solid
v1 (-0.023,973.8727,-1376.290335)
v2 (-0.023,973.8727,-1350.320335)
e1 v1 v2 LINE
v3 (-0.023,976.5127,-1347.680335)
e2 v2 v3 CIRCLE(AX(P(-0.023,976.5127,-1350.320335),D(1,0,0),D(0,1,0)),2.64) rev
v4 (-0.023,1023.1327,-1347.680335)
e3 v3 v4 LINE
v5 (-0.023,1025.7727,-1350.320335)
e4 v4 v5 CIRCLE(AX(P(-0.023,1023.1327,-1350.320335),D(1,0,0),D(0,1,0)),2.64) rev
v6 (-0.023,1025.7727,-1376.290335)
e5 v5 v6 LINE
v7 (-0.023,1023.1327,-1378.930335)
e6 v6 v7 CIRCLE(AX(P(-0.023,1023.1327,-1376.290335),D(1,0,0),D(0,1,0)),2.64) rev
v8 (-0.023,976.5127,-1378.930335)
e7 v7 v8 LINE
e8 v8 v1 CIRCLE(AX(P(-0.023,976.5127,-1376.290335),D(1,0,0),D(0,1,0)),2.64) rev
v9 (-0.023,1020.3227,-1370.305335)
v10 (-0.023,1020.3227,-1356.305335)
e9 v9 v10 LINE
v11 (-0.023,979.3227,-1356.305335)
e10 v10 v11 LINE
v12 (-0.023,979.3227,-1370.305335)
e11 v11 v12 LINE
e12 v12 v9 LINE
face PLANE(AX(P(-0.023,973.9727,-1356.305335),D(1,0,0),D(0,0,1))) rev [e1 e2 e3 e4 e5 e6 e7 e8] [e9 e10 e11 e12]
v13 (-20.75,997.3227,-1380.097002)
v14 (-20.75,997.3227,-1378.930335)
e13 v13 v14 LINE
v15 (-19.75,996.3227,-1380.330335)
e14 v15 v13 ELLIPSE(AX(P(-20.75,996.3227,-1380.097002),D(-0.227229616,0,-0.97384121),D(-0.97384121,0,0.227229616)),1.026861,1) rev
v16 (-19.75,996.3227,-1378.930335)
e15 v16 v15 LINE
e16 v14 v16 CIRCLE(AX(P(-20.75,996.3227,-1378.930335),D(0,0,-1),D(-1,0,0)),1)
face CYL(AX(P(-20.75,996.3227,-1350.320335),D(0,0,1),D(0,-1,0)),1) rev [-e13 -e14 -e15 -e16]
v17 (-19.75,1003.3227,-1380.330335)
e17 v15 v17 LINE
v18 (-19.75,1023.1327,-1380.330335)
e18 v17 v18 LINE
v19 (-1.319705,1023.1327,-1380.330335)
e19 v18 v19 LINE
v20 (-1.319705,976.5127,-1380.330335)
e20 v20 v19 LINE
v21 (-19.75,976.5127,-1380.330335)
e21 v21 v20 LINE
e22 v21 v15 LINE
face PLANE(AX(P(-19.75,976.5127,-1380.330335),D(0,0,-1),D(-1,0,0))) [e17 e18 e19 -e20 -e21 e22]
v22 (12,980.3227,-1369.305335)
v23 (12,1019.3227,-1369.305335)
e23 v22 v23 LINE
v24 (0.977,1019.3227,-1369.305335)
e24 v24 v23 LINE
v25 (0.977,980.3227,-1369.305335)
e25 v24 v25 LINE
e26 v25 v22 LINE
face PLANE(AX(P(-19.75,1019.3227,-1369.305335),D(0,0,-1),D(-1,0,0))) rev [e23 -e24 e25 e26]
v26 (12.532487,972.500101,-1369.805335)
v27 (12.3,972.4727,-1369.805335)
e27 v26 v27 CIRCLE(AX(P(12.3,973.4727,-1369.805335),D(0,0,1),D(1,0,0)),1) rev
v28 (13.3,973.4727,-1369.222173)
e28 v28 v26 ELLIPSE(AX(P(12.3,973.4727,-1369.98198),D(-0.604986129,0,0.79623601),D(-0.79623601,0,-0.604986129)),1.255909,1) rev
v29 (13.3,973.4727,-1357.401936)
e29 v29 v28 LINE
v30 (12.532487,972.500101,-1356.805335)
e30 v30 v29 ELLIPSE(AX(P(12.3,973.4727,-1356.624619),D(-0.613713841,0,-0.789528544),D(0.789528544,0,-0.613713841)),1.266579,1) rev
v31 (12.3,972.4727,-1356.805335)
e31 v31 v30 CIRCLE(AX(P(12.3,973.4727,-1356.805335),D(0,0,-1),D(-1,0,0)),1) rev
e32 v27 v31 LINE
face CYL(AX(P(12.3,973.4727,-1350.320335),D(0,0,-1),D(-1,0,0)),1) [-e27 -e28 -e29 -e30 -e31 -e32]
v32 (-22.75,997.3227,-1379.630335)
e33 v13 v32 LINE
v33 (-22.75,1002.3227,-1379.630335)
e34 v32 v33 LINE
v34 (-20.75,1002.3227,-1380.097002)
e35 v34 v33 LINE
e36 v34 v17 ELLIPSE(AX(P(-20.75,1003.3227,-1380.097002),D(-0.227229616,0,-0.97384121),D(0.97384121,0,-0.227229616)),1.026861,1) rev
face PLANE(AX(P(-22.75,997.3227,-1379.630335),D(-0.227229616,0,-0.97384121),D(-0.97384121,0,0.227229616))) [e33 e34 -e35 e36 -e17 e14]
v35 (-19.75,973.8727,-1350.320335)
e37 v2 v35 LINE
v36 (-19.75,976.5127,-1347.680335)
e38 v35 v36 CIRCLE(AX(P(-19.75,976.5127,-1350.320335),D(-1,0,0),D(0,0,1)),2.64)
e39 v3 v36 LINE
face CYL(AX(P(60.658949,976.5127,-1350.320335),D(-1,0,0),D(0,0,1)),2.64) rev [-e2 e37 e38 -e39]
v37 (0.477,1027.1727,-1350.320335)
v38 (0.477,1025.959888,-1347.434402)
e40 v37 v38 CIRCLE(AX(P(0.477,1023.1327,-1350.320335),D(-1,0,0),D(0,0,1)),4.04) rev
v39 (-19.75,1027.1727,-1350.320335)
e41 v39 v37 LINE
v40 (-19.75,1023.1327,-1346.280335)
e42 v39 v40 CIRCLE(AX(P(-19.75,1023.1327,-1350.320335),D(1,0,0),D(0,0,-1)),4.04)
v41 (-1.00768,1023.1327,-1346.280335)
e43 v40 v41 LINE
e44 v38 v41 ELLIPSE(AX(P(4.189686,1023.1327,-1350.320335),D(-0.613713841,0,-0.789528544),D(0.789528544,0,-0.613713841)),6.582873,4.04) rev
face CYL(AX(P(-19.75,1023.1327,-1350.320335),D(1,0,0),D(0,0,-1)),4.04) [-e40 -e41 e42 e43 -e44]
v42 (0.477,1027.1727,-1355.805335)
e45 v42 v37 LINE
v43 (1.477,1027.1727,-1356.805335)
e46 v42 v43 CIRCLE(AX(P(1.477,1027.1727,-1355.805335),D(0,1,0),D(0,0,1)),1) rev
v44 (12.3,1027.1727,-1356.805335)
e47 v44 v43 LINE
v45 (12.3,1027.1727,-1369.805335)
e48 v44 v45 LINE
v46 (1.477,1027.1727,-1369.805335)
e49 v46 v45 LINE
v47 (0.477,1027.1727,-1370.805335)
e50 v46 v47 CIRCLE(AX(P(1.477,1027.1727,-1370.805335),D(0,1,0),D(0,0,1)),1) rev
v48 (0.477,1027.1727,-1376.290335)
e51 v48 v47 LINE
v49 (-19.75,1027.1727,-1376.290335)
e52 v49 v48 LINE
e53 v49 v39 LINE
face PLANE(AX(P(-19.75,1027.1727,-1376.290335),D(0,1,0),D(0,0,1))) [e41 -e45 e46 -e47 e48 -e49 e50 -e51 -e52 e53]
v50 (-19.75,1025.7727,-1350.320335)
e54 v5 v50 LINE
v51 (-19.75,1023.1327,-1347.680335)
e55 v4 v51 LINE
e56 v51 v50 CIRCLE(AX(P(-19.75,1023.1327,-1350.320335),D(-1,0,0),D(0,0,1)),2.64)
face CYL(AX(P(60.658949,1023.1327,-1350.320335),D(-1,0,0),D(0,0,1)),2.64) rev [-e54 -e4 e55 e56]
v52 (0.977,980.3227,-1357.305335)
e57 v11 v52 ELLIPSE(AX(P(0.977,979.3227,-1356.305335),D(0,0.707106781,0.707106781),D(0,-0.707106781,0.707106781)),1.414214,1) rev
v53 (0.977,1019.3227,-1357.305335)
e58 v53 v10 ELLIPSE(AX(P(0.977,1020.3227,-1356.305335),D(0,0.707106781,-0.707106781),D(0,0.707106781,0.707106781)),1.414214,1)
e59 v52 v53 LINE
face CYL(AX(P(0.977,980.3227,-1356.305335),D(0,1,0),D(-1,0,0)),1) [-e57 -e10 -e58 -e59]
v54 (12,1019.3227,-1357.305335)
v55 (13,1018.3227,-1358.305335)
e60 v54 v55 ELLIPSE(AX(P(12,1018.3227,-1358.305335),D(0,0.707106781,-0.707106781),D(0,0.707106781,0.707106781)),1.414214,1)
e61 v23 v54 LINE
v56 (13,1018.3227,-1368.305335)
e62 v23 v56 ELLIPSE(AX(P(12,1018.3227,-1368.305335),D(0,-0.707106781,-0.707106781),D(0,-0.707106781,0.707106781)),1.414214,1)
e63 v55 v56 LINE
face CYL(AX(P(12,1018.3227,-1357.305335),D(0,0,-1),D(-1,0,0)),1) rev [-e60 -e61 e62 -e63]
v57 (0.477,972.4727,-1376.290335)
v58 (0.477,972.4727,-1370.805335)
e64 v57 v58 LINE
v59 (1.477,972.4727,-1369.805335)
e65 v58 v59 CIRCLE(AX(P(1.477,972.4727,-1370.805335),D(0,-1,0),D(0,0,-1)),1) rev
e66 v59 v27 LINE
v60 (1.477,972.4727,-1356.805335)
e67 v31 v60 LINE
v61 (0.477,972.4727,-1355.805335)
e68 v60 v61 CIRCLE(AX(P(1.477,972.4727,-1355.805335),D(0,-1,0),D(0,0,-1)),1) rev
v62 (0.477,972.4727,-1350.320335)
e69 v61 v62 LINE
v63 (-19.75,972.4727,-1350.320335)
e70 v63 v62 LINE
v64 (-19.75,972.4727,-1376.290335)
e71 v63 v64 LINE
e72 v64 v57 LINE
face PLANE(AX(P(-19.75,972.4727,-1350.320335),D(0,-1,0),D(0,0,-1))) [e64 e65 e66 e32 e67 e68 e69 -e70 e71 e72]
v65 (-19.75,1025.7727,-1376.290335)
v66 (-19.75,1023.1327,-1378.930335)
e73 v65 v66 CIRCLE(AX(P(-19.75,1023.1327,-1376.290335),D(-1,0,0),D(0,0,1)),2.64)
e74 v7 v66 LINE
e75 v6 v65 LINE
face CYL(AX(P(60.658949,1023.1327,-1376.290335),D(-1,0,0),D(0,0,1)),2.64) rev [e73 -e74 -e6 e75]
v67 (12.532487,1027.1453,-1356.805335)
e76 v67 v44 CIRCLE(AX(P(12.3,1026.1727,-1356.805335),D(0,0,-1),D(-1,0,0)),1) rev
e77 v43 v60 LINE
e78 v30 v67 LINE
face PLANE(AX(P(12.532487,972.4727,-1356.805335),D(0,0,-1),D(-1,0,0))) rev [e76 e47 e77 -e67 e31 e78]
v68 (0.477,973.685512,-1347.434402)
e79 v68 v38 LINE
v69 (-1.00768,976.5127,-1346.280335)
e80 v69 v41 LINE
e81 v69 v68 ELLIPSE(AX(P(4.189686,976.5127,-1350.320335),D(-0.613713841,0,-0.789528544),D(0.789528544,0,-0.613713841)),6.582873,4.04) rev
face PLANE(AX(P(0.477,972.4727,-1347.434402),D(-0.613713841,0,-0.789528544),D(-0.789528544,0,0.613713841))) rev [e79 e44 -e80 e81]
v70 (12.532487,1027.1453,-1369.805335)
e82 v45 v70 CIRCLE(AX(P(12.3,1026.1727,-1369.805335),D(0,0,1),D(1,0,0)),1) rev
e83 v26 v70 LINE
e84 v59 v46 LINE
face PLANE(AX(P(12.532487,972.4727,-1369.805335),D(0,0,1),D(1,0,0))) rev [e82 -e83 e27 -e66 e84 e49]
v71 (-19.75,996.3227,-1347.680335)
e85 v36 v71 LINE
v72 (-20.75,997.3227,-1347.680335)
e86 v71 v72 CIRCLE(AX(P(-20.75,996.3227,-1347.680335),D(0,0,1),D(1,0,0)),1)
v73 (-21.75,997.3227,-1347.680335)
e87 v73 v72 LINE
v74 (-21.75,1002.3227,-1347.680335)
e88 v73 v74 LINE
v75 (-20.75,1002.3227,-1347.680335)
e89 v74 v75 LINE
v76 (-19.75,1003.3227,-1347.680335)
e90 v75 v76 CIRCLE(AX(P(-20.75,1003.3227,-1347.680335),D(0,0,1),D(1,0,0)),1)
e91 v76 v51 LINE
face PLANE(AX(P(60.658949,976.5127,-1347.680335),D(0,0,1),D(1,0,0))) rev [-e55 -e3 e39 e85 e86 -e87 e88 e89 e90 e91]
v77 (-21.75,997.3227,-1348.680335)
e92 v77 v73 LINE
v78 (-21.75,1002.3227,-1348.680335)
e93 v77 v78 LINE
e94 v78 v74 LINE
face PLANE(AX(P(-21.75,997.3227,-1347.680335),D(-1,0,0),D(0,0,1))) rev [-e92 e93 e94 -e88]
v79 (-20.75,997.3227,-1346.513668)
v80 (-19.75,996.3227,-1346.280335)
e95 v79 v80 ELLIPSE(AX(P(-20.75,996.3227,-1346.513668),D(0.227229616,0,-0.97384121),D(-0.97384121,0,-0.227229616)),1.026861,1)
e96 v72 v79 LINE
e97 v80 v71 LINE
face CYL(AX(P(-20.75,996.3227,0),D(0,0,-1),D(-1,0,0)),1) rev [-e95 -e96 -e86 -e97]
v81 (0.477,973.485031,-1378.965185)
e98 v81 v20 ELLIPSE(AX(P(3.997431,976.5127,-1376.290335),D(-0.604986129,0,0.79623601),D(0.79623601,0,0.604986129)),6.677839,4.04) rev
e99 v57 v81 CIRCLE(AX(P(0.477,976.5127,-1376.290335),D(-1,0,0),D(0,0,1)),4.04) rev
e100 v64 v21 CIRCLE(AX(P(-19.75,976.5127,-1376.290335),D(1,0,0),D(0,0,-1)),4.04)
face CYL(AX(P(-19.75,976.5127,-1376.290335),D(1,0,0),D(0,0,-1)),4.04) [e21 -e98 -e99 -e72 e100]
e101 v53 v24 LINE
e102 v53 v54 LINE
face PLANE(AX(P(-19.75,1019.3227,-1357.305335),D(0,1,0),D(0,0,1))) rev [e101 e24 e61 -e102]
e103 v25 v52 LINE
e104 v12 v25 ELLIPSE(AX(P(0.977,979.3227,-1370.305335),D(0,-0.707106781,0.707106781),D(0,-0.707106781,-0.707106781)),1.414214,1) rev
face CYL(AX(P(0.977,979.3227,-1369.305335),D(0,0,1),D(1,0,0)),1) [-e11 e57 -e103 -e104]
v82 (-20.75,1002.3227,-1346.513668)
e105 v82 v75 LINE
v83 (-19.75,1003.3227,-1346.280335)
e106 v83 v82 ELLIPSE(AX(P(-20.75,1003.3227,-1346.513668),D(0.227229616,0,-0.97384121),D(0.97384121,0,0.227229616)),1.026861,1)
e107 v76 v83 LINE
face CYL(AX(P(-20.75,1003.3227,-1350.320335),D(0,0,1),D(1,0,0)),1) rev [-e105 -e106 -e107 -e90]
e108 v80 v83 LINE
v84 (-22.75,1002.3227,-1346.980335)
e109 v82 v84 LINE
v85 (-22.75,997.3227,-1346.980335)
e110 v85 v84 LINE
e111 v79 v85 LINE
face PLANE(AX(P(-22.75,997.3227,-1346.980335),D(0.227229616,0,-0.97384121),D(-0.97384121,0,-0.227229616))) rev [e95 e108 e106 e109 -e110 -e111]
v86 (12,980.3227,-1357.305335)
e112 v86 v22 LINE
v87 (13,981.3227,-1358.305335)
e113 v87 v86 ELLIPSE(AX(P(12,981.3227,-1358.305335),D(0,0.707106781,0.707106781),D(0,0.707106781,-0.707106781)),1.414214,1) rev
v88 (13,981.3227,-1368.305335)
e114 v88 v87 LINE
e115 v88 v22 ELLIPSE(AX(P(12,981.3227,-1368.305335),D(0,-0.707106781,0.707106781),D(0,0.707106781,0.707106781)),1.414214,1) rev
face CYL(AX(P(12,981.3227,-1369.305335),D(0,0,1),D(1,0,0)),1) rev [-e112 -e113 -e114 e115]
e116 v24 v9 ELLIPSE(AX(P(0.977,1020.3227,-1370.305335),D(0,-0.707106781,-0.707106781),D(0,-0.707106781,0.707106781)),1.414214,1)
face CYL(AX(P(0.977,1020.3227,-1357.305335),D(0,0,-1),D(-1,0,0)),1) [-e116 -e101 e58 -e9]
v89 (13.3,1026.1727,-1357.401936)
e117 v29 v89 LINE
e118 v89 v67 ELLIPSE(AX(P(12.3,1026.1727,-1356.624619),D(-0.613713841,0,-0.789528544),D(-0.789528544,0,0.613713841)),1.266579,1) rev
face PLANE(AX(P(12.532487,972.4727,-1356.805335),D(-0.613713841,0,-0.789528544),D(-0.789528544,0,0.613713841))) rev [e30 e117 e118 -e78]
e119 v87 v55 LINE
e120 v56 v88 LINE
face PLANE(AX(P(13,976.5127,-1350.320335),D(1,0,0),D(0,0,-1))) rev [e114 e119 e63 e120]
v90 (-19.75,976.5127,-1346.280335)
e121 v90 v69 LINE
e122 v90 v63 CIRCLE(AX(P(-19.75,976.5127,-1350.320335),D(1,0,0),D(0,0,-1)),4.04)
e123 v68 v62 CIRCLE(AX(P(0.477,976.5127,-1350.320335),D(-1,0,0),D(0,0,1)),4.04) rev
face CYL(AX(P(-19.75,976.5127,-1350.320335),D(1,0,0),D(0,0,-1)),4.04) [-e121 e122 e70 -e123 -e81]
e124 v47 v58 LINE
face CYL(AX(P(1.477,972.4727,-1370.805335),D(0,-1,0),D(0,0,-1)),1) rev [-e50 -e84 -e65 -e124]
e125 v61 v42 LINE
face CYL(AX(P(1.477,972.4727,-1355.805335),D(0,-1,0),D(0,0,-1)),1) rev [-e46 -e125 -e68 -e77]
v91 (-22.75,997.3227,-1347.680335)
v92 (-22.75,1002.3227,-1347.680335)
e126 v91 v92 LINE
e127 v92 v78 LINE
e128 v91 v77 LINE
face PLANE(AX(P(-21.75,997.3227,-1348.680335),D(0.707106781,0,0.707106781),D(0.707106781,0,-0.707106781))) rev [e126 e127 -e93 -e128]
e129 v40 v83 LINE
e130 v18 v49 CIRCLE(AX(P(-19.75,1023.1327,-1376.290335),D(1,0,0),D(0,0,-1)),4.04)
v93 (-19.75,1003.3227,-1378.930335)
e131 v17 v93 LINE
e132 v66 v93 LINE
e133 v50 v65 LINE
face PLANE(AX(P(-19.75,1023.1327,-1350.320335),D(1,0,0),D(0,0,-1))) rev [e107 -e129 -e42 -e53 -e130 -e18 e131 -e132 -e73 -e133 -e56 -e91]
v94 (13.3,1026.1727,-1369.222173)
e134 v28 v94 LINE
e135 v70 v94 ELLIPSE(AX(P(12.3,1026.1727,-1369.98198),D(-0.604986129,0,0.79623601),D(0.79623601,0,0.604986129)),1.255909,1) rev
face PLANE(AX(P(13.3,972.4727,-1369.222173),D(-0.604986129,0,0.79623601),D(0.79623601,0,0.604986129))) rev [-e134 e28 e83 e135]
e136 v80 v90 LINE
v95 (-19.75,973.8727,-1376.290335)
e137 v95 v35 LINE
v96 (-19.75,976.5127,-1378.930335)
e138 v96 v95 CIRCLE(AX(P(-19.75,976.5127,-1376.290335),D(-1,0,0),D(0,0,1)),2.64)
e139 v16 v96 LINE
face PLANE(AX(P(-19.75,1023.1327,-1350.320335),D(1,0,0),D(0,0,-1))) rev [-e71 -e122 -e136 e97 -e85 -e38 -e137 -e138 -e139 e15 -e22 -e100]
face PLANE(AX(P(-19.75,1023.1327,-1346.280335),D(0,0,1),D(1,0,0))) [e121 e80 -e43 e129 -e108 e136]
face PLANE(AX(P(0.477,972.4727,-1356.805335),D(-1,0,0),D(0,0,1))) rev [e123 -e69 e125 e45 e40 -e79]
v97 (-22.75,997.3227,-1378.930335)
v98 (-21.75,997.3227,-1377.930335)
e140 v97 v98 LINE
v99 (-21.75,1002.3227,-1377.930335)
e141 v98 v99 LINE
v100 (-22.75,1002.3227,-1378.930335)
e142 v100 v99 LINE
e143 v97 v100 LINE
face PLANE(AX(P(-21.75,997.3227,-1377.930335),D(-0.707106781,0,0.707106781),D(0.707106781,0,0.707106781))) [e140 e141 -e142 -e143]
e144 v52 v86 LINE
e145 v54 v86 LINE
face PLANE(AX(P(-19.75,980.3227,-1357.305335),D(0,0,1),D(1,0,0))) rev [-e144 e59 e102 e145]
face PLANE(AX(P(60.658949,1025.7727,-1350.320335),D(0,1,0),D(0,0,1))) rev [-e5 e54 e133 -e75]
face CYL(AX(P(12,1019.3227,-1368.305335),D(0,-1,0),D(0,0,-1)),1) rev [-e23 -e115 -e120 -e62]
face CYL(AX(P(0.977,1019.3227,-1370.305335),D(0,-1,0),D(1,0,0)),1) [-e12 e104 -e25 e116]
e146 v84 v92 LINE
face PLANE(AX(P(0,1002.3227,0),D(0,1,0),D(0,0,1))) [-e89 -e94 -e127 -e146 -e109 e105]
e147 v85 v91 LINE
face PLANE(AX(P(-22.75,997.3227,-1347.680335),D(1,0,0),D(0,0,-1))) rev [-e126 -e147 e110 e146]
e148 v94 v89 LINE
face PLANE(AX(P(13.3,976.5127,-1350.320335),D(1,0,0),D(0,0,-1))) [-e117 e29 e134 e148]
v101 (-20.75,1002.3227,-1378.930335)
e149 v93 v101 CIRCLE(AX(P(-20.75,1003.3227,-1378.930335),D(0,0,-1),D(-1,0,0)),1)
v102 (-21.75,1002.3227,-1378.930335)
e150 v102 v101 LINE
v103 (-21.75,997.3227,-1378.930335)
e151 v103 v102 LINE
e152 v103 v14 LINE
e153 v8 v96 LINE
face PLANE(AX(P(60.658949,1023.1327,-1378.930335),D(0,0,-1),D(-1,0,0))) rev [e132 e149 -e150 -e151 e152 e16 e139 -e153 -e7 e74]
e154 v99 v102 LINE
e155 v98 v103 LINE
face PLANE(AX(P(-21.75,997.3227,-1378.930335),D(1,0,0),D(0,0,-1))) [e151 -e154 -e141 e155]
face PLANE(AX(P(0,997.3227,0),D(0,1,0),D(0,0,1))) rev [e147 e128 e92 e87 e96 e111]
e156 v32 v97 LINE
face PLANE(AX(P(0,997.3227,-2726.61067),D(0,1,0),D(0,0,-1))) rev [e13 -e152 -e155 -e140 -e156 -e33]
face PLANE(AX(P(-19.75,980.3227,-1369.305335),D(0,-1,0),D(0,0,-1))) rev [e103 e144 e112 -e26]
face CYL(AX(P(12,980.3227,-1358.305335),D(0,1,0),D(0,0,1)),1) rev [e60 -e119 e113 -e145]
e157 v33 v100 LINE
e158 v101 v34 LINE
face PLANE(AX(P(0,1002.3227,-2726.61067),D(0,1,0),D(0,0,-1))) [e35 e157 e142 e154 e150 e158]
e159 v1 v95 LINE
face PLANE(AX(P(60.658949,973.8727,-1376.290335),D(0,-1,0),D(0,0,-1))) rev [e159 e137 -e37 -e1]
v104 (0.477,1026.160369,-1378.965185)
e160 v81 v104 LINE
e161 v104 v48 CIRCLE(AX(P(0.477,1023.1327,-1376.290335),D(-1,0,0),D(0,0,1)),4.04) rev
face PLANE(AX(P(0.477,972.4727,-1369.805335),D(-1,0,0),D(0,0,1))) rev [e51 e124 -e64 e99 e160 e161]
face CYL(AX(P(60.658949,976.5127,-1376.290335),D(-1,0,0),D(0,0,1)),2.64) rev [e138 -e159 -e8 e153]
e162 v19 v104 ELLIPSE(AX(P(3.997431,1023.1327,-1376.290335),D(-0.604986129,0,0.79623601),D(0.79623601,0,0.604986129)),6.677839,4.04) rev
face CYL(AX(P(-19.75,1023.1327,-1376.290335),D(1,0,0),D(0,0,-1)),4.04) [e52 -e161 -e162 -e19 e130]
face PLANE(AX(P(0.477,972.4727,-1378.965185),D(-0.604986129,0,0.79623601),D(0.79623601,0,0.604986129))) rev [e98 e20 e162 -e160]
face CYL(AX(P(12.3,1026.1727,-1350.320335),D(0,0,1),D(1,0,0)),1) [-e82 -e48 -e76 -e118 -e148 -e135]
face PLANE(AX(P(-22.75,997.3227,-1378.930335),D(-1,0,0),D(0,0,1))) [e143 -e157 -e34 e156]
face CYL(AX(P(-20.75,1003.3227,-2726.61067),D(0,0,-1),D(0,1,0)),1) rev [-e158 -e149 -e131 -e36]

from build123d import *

# Parameters (mm, degrees)
BOSS_EXTRUDE2_DEPTH      = 13
BOSS_EXTRUDE2_DEPTH_BACK = 19.75
SKETCH2_W                = 39
SKETCH2_H                = 12
BOSS_EXTRUDE3_DEPTH      = 0.3
CUT_EXTRUDE1_DEPTH       = 19.727
CLIP_EDGE_DEPTH          = 2.5
FILLET1_R                = 1
CUT_EXTRUDE2_DEPTH       = 1382.6010589
FILLET2_R                = 1


with BuildPart() as part:
    # Sketch2 → Boss-Extrude2 (new, two sides: drawn at the far end of the back side and taken through both)
    with BuildSketch(Plane(origin=(0, 0, 0), x_dir=(0, -1, 0), z_dir=(1, 0, 0)).offset(-BOSS_EXTRUDE2_DEPTH_BACK)):
        with BuildLine():
            Line((-1027.172700071, 1376.290334899), (-1027.172700071, 1350.320334899))
            ThreePointArc((-1027.172700071, 1350.320334899), (-1025.989411467, 1347.463623503), (-1023.132700071, 1346.280334899))
            Line((-1023.132700071, 1346.280334899), (-976.512700071, 1346.280334899))
            ThreePointArc((-976.512700071, 1346.280334899), (-973.655988675, 1347.463623503), (-972.472700071, 1350.320334899))
            Line((-972.472700071, 1350.320334899), (-972.472700071, 1376.290334899))
            ThreePointArc((-972.472700071, 1376.290334899), (-973.655988675, 1379.147046295), (-976.512700071, 1380.330334899))
            Line((-976.512700071, 1380.330334899), (-1023.132700071, 1380.330334899))
            ThreePointArc((-1023.132700071, 1380.330334899), (-1025.989411467, 1379.147046295), (-1027.172700071, 1376.290334899))
        make_face()
        with Locations((-999.822700071, 1363.305334899)):
            Rectangle(SKETCH2_W, SKETCH2_H, mode=Mode.SUBTRACT)
    extrude(amount=BOSS_EXTRUDE2_DEPTH + BOSS_EXTRUDE2_DEPTH_BACK)

    # Sketch3 → Boss-Extrude3 (add)
    with BuildSketch(Plane.YZ.offset(13)):
        with BuildLine():
            Line((972.472700071, -1350.320334899), (972.472700071, -1376.290334899))
            ThreePointArc((972.472700071, -1376.290334899), (973.655988675, -1379.147046295), (976.512700071, -1380.330334899))
            Line((976.512700071, -1380.330334899), (1023.132700071, -1380.330334899))
            ThreePointArc((1023.132700071, -1380.330334899), (1025.989411467, -1379.147046295), (1027.172700071, -1376.290334899))
            Line((1027.172700071, -1376.290334899), (1027.172700071, -1350.320334899))
            ThreePointArc((1027.172700071, -1350.320334899), (1025.989411467, -1347.463623503), (1023.132700071, -1346.280334899))
            Line((1023.132700071, -1346.280334899), (976.512700071, -1346.280334899))
            ThreePointArc((976.512700071, -1346.280334899), (973.655988675, -1347.463623503), (972.472700071, -1350.320334899))
        make_face()
    extrude(amount=BOSS_EXTRUDE3_DEPTH)

    # Sketch6 → Cut-Extrude1 (cut)
    with BuildSketch(Plane(origin=(-19.75, 0, 0), x_dir=(0, -1, 0), z_dir=(-1, 0, 0))):
        with BuildLine():
            Line((-1025.772700071, -1350.320334899), (-1025.772700071, -1376.290334899))
            ThreePointArc((-1025.772700071, -1376.290334899), (-1024.999461974, -1378.157096801), (-1023.132700071, -1378.930334899))
            Line((-1023.132700071, -1378.930334899), (-976.512700071, -1378.930334899))
            ThreePointArc((-976.512700071, -1378.930334899), (-974.645938169, -1378.157096801), (-973.872700071, -1376.290334899))
            Line((-973.872700071, -1376.290334899), (-973.872700071, -1350.320334899))
            ThreePointArc((-973.872700071, -1350.320334899), (-974.645938169, -1348.453572996), (-976.512700071, -1347.680334899))
            Line((-976.512700071, -1347.680334899), (-1023.132700071, -1347.680334899))
            ThreePointArc((-1023.132700071, -1347.680334899), (-1024.999461974, -1348.453572996), (-1025.772700071, -1350.320334899))
        make_face()
    extrude(amount=-CUT_EXTRUDE1_DEPTH, mode=Mode.SUBTRACT)

    # Sketch10 → Clip Edge (add, symmetric)
    with BuildSketch(Plane(origin=(0, 999.822700071, 0), x_dir=(-1, 0, 0), z_dir=(0, -1, 0))):
        Polygon((19.75, 1346.280334899), (19.75, 1347.680334899), (21.75, 1347.680334899), (21.75, 1348.680334899), (22.75, 1347.680334899), (22.75, 1346.980334899), align=None)
    clip_edge = extrude(amount=CLIP_EDGE_DEPTH, both=True)

    # Mirror1: Clip Edge across plane
    add(clip_edge.mirror(Plane(origin=(0, 0, -1363.305334899), x_dir=(1, 0, 0), z_dir=(0, 0, -1))))

    # Fillet1
    # the kernel refuses this fillet: 1 mm, written as the material it adds along each edge
    with BuildSketch(Plane(origin=(-19.75, 1002.322700071, -1346.280334899), x_dir=(0, 1, 0), z_dir=(0, 0, -1))) as fillet1_piece_1_section:
        with BuildLine():
            CenterArc((FILLET1_R, -FILLET1_R), FILLET1_R, 90, 90)
            Line((0, -FILLET1_R), (0, 0))
            Line((0, 0), (FILLET1_R, 0))
        make_face()
    fillet1_piece_1 = extrude(amount=1.4, mode=Mode.PRIVATE)
    fillet1_piece_1 = split(fillet1_piece_1, bisect_by=Plane(origin=(-20.117660962, 1002.553814872, -1346.366122456), z_dir=(0.22722961560622243, 0, -0.973841209741839)), keep=Keep.TOP, mode=Mode.PRIVATE)
    add(fillet1_piece_1)
    with BuildSketch(Plane(origin=(-19.75, 997.322700071, -1346.280334899), x_dir=(0, -1, 0), z_dir=(0, 0, -1))) as fillet1_piece_2_section:
        with BuildLine():
            CenterArc((FILLET1_R, FILLET1_R), FILLET1_R, 180, 90)
            Line((0, FILLET1_R), (0, 0))
            Line((0, 0), (FILLET1_R, 0))
        make_face()
    fillet1_piece_2 = extrude(amount=1.4, mode=Mode.PRIVATE)
    fillet1_piece_2 = split(fillet1_piece_2, bisect_by=Plane(origin=(-20.117660962, 997.091585271, -1346.366122456), z_dir=(0.22722961560622243, 0, -0.973841209741839)), keep=Keep.TOP, mode=Mode.PRIVATE)
    add(fillet1_piece_2)
    with BuildSketch(Plane(origin=(-19.75, 997.322700071, -1380.330334899), x_dir=(0, -1, 0), z_dir=(0, 0, 1))) as fillet1_piece_3_section:
        with BuildLine():
            CenterArc((FILLET1_R, -FILLET1_R), FILLET1_R, 90, 90)
            Line((0, -FILLET1_R), (0, 0))
            Line((0, 0), (FILLET1_R, 0))
        make_face()
    fillet1_piece_3 = extrude(amount=1.4, mode=Mode.PRIVATE)
    fillet1_piece_3 = split(fillet1_piece_3, bisect_by=Plane(origin=(-20.117660962, 997.091585271, -1380.244547341), z_dir=(0.22722961560622243, 0, 0.973841209741839)), keep=Keep.TOP, mode=Mode.PRIVATE)
    add(fillet1_piece_3)
    with BuildSketch(Plane(origin=(-19.75, 1002.322700071, -1380.330334899), x_dir=(0, 1, 0), z_dir=(0, 0, 1))) as fillet1_piece_4_section:
        with BuildLine():
            CenterArc((FILLET1_R, FILLET1_R), FILLET1_R, 180, 90)
            Line((0, FILLET1_R), (0, 0))
            Line((0, 0), (FILLET1_R, 0))
        make_face()
    fillet1_piece_4 = extrude(amount=1.4, mode=Mode.PRIVATE)
    fillet1_piece_4 = split(fillet1_piece_4, bisect_by=Plane(origin=(-20.117660962, 1002.553814872, -1380.244547341), z_dir=(0.22722961560622243, 0, 0.973841209741839)), keep=Keep.TOP, mode=Mode.PRIVATE)
    add(fillet1_piece_4)
    with BuildSketch(Plane(origin=(13, 1021.822700071, -1369.305334899), x_dir=(-1, 0, 0), z_dir=(0, -1, 0)), Plane(origin=(13, 977.822700071, -1357.305334899), x_dir=(-1, 0, 0), z_dir=(0, 1, 0))) as fillet1_piece_5:
        with BuildLine():
            CenterArc((FILLET1_R, -FILLET1_R), FILLET1_R, 90, 90)
            Line((0, -FILLET1_R), (0, 0))
            Line((0, 0), (FILLET1_R, 0))
        make_face()
    extrude(amount=44)
    with BuildSketch(Plane(origin=(13, 1019.322700071, -1354.805334899), x_dir=(-1, 0, 0), z_dir=(0, 0, -1)), Plane(origin=(13, 980.322700071, -1371.805334899), x_dir=(-1, 0, 0), z_dir=(0, 0, 1))) as fillet1_piece_6:
        with BuildLine():
            CenterArc((FILLET1_R, -FILLET1_R), FILLET1_R, 90, 90)
            Line((0, -FILLET1_R), (0, 0))
            Line((0, 0), (FILLET1_R, 0))
        make_face()
    extrude(amount=17)
    # the kernel refuses this fillet: 1 mm, written as the material it takes off along each edge
    with BuildSketch(Plane(origin=(13.3, 976.512700071, -1350.320334899), x_dir=(0, 0, 1), z_dir=(0, 1, 0))) as fillet1_2_piece_1:
        with BuildLine():
            CenterArc((4.04 - FILLET1_R, -FILLET1_R), FILLET1_R, 0, 90)
            Line((4.04 - FILLET1_R, 0), (4.04, 0))
            Line((4.04, 0), (4.04, -FILLET1_R))
        make_face()
    revolve(axis=Axis((13.3, 976.512700071, -1350.320334899), (1, 0, 0)), revolution_arc=90, mode=Mode.SUBTRACT)
    with BuildSketch(Plane(origin=(13.3, 972.472700071, -1350.320334899), x_dir=(-1, 0, 0), z_dir=(0, 0, -1)), Plane(origin=(13.3, 1027.172700071, -1376.290334899), x_dir=(-1, 0, 0), z_dir=(0, 0, 1))) as fillet1_2_piece_2:
        with BuildLine():
            CenterArc((FILLET1_R, FILLET1_R), FILLET1_R, 180, 90)
            Line((0, FILLET1_R), (0, 0))
            Line((0, 0), (FILLET1_R, 0))
        make_face()
    extrude(amount=25.97, mode=Mode.SUBTRACT)
    with BuildSketch(Plane(origin=(13.3, 976.512700071, -1376.290334899), x_dir=(0, -1, 0), z_dir=(0, 0, 1))) as fillet1_2_piece_3:
        with BuildLine():
            CenterArc((4.04 - FILLET1_R, -FILLET1_R), FILLET1_R, 0, 90)
            Line((4.04 - FILLET1_R, 0), (4.04, 0))
            Line((4.04, 0), (4.04, -FILLET1_R))
        make_face()
    revolve(axis=Axis((13.3, 976.512700071, -1376.290334899), (1, 0, 0)), revolution_arc=90, mode=Mode.SUBTRACT)
    with BuildSketch(Plane(origin=(13.3, 976.512700071, -1380.330334899), x_dir=(-1, 0, 0), z_dir=(0, 1, 0)), Plane(origin=(13.3, 1023.132700071, -1346.280334899), x_dir=(-1, 0, 0), z_dir=(0, -1, 0))) as fillet1_2_piece_4:
        with BuildLine():
            CenterArc((FILLET1_R, FILLET1_R), FILLET1_R, 180, 90)
            Line((0, FILLET1_R), (0, 0))
            Line((0, 0), (FILLET1_R, 0))
        make_face()
    extrude(amount=46.62, mode=Mode.SUBTRACT)
    with BuildSketch(Plane(origin=(13.3, 1023.132700071, -1376.290334899), x_dir=(0, 0, -1), z_dir=(0, -1, 0))) as fillet1_2_piece_5:
        with BuildLine():
            CenterArc((4.04 - FILLET1_R, -FILLET1_R), FILLET1_R, 0, 90)
            Line((4.04, -FILLET1_R), (4.04, 0))
            Line((4.04, 0), (4.04 - FILLET1_R, 0))
        make_face()
    revolve(axis=Axis((13.3, 1023.132700071, -1376.290334899), (1, 0, 0)), revolution_arc=90, mode=Mode.SUBTRACT)
    with BuildSketch(Plane(origin=(13.3, 1023.132700071, -1350.320334899), x_dir=(0, 1, 0), z_dir=(0, 0, -1))) as fillet1_2_piece_6:
        with BuildLine():
            CenterArc((4.04 - FILLET1_R, -FILLET1_R), FILLET1_R, 0, 90)
            Line((4.04 - FILLET1_R, 0), (4.04, 0))
            Line((4.04, 0), (4.04, -FILLET1_R))
        make_face()
    revolve(axis=Axis((13.3, 1023.132700071, -1350.320334899), (1, 0, 0)), revolution_arc=90, mode=Mode.SUBTRACT)
    with BuildSketch(Plane(origin=(-0.023, 1019.322700071, -1369.305334899), x_dir=(0, 1, 0), z_dir=(0, 0, 1)), Plane(origin=(-0.023, 980.322700071, -1357.305334899), x_dir=(0, -1, 0), z_dir=(0, 0, -1))) as fillet1_2_piece_7:
        with BuildLine():
            CenterArc((FILLET1_R, -FILLET1_R), FILLET1_R, 90, 90)
            Line((0, -FILLET1_R), (0, 0))
            Line((0, 0), (FILLET1_R, 0))
        make_face()
    extrude(amount=12, mode=Mode.SUBTRACT)
    with BuildSketch(Plane(origin=(-0.023, 980.322700071, -1369.305334899), x_dir=(0, 0, -1), z_dir=(0, 1, 0)), Plane(origin=(-0.023, 1019.322700071, -1357.305334899), x_dir=(0, 0, 1), z_dir=(0, -1, 0))) as fillet1_2_piece_8:
        with BuildLine():
            CenterArc((FILLET1_R, -FILLET1_R), FILLET1_R, 90, 90)
            Line((0, -FILLET1_R), (0, 0))
            Line((0, 0), (FILLET1_R, 0))
        make_face()
    extrude(amount=39, mode=Mode.SUBTRACT)
    with BuildSketch(Plane(origin=(-0.023, 1019.322700071, -1371.805334899), x_dir=(0, 1, 0), z_dir=(0, 0, 1))) as fillet1_2_piece_9a_section:
        with BuildLine():
            CenterArc((FILLET1_R, -FILLET1_R), FILLET1_R, 90, 90)
            Line((0, -FILLET1_R), (0, 0))
            Line((0, 0), (FILLET1_R, 0))
        make_face()
    fillet1_2_piece_9a = extrude(amount=14.5, mode=Mode.PRIVATE)
    fillet1_2_piece_9a = split(fillet1_2_piece_9a, bisect_by=Plane(origin=(0.203395114, 1019.549095185, -1369.305334899), z_dir=(0, 0, -1)), keep=Keep.TOP, mode=Mode.PRIVATE)
    with BuildSketch(Plane(origin=(-0.023, 980.322700071, -1369.305334899), x_dir=(0, 0, -1), z_dir=(0, 1, 0))) as fillet1_2_piece_9b_section:
        with BuildLine():
            CenterArc((FILLET1_R, -FILLET1_R), FILLET1_R, 90, 90)
            Line((0, -FILLET1_R), (0, 0))
            Line((0, 0), (FILLET1_R, 0))
        make_face()
    fillet1_2_piece_9b = extrude(amount=41.5, mode=Mode.PRIVATE)
    fillet1_2_piece_9b = split(fillet1_2_piece_9b, bisect_by=Plane(origin=(0.203395114, 1019.322700071, -1369.531730013), z_dir=(0, 1, 0)), keep=Keep.TOP, mode=Mode.PRIVATE)
    fillet1_2_piece_9 = fillet1_2_piece_9a & fillet1_2_piece_9b
    add(fillet1_2_piece_9, mode=Mode.SUBTRACT)
    with BuildSketch(Plane(origin=(-0.023, 1021.822700071, -1357.305334899), x_dir=(0, 0, 1), z_dir=(0, -1, 0))) as fillet1_2_piece_10a_section:
        with BuildLine():
            CenterArc((FILLET1_R, -FILLET1_R), FILLET1_R, 90, 90)
            Line((0, -FILLET1_R), (0, 0))
            Line((0, 0), (FILLET1_R, 0))
        make_face()
    fillet1_2_piece_10a = extrude(amount=41.5, mode=Mode.PRIVATE)
    fillet1_2_piece_10a = split(fillet1_2_piece_10a, bisect_by=Plane(origin=(0.203395114, 1019.322700071, -1357.078939784), z_dir=(0, 1, 0)), keep=Keep.TOP, mode=Mode.PRIVATE)
    with BuildSketch(Plane(origin=(-0.023, 1019.322700071, -1369.305334899), x_dir=(0, 1, 0), z_dir=(0, 0, 1))) as fillet1_2_piece_10b_section:
        with BuildLine():
            CenterArc((FILLET1_R, -FILLET1_R), FILLET1_R, 90, 90)
            Line((0, -FILLET1_R), (0, 0))
            Line((0, 0), (FILLET1_R, 0))
        make_face()
    fillet1_2_piece_10b = extrude(amount=14.5, mode=Mode.PRIVATE)
    fillet1_2_piece_10b = split(fillet1_2_piece_10b, bisect_by=Plane(origin=(0.203395114, 1019.549095185, -1357.305334899), z_dir=(0, 0, 1)), keep=Keep.TOP, mode=Mode.PRIVATE)
    fillet1_2_piece_10 = fillet1_2_piece_10a & fillet1_2_piece_10b
    add(fillet1_2_piece_10, mode=Mode.SUBTRACT)
    with BuildSketch(Plane(origin=(-0.023, 980.322700071, -1357.305334899), x_dir=(0, -1, 0), z_dir=(0, 0, -1))) as fillet1_2_piece_11a_section:
        with BuildLine():
            CenterArc((FILLET1_R, -FILLET1_R), FILLET1_R, 90, 90)
            Line((0, -FILLET1_R), (0, 0))
            Line((0, 0), (FILLET1_R, 0))
        make_face()
    fillet1_2_piece_11a = extrude(amount=14.5, mode=Mode.PRIVATE)
    fillet1_2_piece_11a = split(fillet1_2_piece_11a, bisect_by=Plane(origin=(0.203395114, 980.096304957, -1369.305334899), z_dir=(0, 0, -1)), keep=Keep.TOP, mode=Mode.PRIVATE)
    with BuildSketch(Plane(origin=(-0.023, 977.822700071, -1369.305334899), x_dir=(0, 0, -1), z_dir=(0, 1, 0))) as fillet1_2_piece_11b_section:
        with BuildLine():
            CenterArc((FILLET1_R, -FILLET1_R), FILLET1_R, 90, 90)
            Line((0, -FILLET1_R), (0, 0))
            Line((0, 0), (FILLET1_R, 0))
        make_face()
    fillet1_2_piece_11b = extrude(amount=41.5, mode=Mode.PRIVATE)
    fillet1_2_piece_11b = split(fillet1_2_piece_11b, bisect_by=Plane(origin=(0.203395114, 980.322700071, -1369.531730013), z_dir=(0, -1, 0)), keep=Keep.TOP, mode=Mode.PRIVATE)
    fillet1_2_piece_11 = fillet1_2_piece_11a & fillet1_2_piece_11b
    add(fillet1_2_piece_11, mode=Mode.SUBTRACT)
    with BuildSketch(Plane(origin=(-0.023, 980.322700071, -1354.805334899), x_dir=(0, -1, 0), z_dir=(0, 0, -1))) as fillet1_2_piece_12a_section:
        with BuildLine():
            CenterArc((FILLET1_R, -FILLET1_R), FILLET1_R, 90, 90)
            Line((0, -FILLET1_R), (0, 0))
            Line((0, 0), (FILLET1_R, 0))
        make_face()
    fillet1_2_piece_12a = extrude(amount=14.5, mode=Mode.PRIVATE)
    fillet1_2_piece_12a = split(fillet1_2_piece_12a, bisect_by=Plane(origin=(0.203395114, 980.096304957, -1357.305334899), z_dir=(0, 0, 1)), keep=Keep.TOP, mode=Mode.PRIVATE)
    with BuildSketch(Plane(origin=(-0.023, 1019.322700071, -1357.305334899), x_dir=(0, 0, 1), z_dir=(0, -1, 0))) as fillet1_2_piece_12b_section:
        with BuildLine():
            CenterArc((FILLET1_R, -FILLET1_R), FILLET1_R, 90, 90)
            Line((0, -FILLET1_R), (0, 0))
            Line((0, 0), (FILLET1_R, 0))
        make_face()
    fillet1_2_piece_12b = extrude(amount=41.5, mode=Mode.PRIVATE)
    fillet1_2_piece_12b = split(fillet1_2_piece_12b, bisect_by=Plane(origin=(0.203395114, 980.322700071, -1357.078939784), z_dir=(0, -1, 0)), keep=Keep.TOP, mode=Mode.PRIVATE)
    fillet1_2_piece_12 = fillet1_2_piece_12a & fillet1_2_piece_12b
    add(fillet1_2_piece_12, mode=Mode.SUBTRACT)

    # Sketch11 → Cut-Extrude2 (cut, through all)
    with BuildSketch(Plane(origin=(0, 1027.172700071, 0), x_dir=(-1, 0, 0), z_dir=(0, 1, 0))):
        with BuildLine():
            Line((-13.3, -1357.401935688), (-13.3, -1350.320334899))
            Line((-13.3, -1350.320334899), (-13.3, -1347.280334899))
            ThreePointArc((-13.3, -1347.280334899), (-13.007106781, -1346.573228118), (-12.3, -1346.280334899))
            Line((-12.3, -1346.280334899), (1.007680047, -1346.280334899))
            Line((1.007680047, -1346.280334899), (-0.477, -1347.434401717))
            Line((-0.477, -1347.434401717), (-0.477, -1356.805334899))
            Line((-0.477, -1356.805334899), (-12.532486997, -1356.805334899))
            Line((-12.532486997, -1356.805334899), (-13.3, -1357.401935688))
        make_face()
        with BuildLine():
            Line((-12.532486997, -1369.805334899), (-0.477, -1369.805334899))
            Line((-0.477, -1369.805334899), (-0.477, -1378.965184901))
            Line((-0.477, -1378.965184901), (1.319704973, -1380.330334899))
            Line((1.319704973, -1380.330334899), (-12.3, -1380.330334899))
            ThreePointArc((-12.3, -1380.330334899), (-13.007106781, -1380.03744168), (-13.3, -1379.330334899))
            Line((-13.3, -1379.330334899), (-13.3, -1369.222172727))
            Line((-13.3, -1369.222172727), (-12.532486997, -1369.805334899))
        make_face()
    extrude(amount=-CUT_EXTRUDE2_DEPTH, mode=Mode.SUBTRACT)

    # Fillet2
    fillet2_edges = [part.edges().sort_by_distance(p)[0] for p in [
        (0.477, 999.822700071, -1369.805334899),
        (0.477, 999.822700071, -1356.805334899),
    ]]
    fillet(fillet2_edges, radius=FILLET2_R)


solid = part.part
